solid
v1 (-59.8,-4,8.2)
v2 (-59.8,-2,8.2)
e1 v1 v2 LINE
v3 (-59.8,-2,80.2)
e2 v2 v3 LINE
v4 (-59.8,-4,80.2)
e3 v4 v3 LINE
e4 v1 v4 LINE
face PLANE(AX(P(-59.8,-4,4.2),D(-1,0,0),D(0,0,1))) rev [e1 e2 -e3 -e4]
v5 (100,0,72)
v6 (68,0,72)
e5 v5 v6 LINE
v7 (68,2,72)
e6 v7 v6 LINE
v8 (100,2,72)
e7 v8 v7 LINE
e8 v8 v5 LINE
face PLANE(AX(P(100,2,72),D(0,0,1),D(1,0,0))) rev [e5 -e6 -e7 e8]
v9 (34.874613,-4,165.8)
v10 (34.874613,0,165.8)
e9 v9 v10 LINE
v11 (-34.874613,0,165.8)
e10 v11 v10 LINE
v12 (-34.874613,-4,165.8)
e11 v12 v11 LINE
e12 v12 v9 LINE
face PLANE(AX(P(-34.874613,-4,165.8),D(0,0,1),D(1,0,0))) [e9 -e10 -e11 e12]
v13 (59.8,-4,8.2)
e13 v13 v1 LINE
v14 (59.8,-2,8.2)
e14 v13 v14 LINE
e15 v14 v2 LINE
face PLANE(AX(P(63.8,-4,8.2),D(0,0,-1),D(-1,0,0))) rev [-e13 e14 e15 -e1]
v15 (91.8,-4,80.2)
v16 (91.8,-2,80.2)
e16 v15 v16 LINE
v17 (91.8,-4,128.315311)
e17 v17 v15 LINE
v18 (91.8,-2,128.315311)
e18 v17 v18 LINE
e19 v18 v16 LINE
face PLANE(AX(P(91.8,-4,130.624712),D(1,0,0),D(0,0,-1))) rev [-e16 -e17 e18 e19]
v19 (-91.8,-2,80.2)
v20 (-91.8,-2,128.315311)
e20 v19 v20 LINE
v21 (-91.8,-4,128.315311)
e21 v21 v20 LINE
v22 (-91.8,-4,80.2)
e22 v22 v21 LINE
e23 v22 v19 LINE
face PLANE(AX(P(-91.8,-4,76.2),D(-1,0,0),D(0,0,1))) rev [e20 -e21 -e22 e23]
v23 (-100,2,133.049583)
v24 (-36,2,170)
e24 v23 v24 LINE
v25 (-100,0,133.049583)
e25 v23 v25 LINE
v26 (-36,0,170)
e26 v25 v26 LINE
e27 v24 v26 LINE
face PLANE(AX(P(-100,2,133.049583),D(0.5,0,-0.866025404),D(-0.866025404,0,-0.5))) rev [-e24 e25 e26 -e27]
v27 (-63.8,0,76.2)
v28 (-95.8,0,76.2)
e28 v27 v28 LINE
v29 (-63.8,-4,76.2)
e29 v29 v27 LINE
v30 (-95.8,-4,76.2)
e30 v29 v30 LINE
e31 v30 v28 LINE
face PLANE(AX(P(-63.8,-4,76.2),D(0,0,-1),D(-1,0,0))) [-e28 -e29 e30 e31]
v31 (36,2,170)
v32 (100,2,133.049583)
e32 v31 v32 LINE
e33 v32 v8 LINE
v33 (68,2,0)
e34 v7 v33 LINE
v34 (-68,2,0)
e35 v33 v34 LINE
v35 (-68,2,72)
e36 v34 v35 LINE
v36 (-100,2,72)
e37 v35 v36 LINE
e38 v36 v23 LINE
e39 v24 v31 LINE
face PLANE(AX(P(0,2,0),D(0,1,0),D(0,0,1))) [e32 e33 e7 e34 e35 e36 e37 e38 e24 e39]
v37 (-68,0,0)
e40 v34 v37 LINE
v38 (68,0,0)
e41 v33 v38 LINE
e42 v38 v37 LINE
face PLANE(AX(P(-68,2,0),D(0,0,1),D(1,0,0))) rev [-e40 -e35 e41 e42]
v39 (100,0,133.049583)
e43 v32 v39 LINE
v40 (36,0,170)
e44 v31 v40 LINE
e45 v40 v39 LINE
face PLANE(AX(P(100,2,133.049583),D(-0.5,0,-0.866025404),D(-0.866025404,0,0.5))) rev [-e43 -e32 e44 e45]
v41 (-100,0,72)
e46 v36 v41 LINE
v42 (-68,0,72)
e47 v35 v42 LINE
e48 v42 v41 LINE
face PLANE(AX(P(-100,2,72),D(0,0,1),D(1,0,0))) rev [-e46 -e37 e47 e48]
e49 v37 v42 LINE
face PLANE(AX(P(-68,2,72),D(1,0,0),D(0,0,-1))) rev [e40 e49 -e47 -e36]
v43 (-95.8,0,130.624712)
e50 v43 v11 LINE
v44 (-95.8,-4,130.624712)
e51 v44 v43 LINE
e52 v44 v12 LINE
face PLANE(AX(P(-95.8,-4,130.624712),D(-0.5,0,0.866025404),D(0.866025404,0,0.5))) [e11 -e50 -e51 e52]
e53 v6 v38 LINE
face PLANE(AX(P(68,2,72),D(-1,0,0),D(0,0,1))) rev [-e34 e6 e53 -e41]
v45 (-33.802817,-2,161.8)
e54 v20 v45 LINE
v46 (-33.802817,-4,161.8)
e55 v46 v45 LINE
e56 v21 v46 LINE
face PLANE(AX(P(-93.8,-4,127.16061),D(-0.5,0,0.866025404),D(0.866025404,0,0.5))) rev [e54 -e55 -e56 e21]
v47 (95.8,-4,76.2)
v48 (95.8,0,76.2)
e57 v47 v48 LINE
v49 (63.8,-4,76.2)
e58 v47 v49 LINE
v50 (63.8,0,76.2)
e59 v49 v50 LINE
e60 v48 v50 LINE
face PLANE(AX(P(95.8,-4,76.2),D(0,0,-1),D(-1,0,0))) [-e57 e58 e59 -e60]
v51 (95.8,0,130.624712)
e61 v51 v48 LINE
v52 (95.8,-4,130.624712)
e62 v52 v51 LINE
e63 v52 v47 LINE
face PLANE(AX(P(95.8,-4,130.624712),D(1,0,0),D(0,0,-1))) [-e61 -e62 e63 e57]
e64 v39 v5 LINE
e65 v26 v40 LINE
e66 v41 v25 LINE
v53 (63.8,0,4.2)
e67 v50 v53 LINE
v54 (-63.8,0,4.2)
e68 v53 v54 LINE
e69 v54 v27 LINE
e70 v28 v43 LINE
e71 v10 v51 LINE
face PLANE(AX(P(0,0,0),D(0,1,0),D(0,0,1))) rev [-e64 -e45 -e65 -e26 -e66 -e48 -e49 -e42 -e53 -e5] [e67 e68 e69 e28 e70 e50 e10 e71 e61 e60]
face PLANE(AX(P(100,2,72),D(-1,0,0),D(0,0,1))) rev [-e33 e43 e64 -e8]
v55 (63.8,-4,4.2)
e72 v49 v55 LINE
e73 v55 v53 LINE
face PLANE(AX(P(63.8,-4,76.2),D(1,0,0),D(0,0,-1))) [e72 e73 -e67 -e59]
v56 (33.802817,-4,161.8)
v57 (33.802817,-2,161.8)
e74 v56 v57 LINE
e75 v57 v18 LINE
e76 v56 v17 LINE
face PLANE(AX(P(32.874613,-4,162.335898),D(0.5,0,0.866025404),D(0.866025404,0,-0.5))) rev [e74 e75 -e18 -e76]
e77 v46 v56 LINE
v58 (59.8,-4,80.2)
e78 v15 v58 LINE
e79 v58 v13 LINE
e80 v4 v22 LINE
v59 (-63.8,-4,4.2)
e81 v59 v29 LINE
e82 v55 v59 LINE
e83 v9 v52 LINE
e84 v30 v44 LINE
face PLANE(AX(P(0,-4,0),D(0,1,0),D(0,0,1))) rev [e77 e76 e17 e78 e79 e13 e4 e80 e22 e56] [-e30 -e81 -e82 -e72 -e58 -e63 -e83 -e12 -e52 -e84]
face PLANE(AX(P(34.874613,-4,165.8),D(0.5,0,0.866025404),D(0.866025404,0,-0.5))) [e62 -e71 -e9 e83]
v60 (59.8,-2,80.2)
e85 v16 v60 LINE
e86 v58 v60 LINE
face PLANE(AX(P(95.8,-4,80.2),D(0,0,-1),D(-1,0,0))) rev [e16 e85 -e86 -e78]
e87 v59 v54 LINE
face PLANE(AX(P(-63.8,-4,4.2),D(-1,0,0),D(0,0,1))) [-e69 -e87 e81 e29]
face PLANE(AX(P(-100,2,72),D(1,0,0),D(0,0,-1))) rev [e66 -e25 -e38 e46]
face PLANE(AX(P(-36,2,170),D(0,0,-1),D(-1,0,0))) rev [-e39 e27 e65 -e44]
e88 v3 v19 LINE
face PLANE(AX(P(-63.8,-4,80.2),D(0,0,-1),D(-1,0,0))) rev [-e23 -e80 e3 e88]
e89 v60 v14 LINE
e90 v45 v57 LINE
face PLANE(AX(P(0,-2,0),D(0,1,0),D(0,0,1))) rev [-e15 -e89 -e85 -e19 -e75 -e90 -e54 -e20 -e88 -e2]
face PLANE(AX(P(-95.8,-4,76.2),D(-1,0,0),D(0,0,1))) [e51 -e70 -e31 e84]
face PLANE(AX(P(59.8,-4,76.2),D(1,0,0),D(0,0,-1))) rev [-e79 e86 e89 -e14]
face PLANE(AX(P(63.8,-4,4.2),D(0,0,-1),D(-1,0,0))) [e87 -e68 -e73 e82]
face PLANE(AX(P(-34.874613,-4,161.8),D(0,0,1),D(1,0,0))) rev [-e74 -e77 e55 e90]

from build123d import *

# Parameters (mm, degrees)
EXTRUDE_1_DEPTH = 2
EXTRUDE_2_DEPTH = 4
SHELL_START     = -4
SHELL_4_DEPTH   = 2


with BuildPart() as part:
    # 草图1 → 凸台-拉伸1 (new body)
    with BuildSketch(Plane(origin=(0, 0, 0), x_dir=(1, 0, 0), z_dir=(0, 1, 0))):
        Polygon((-100, -133.049582772), (-36, -170), (36, -170), (100, -133.049582772), (100, -72), (68, -72), (68, 0), (-68, 0), (-68, -72), (-100, -72), align=None)
    extrude(amount=EXTRUDE_1_DEPTH)

    # 草图2 → 凸台-拉伸2 (add)
    with BuildSketch(Plane(origin=(0, 0, 0), x_dir=(1, 0, 0), z_dir=(0, 1, 0))):
        Polygon((95.8, -76.2), (63.8, -76.2), (63.8, -4.2), (-63.8, -4.2), (-63.8, -76.2), (-95.8, -76.2), (-95.8, -130.624711641), (-34.874613392, -165.8), (34.874613392, -165.8), (95.8, -130.624711641), align=None)
    extrude(amount=-EXTRUDE_2_DEPTH)

    # 抽壳4: read off the stored shape, not the designer's step
    # 抽壳4 outline → 抽壳4 (cut)
    with BuildSketch(Plane(origin=(0, 0, 0), x_dir=(1, 0, 0), z_dir=(0, 1, 0)).offset(SHELL_START)):
        Polygon((33.802816622, -161.8), (91.8, -128.315310565), (91.8, -80.2), (59.8, -80.2), (59.8, -8.2), (-59.8, -8.2), (-59.8, -80.2), (-91.8, -80.2), (-91.8, -128.315310565), (-33.802816622, -161.8), align=None)
    extrude(amount=SHELL_4_DEPTH, mode=Mode.SUBTRACT)


solid = part.part
